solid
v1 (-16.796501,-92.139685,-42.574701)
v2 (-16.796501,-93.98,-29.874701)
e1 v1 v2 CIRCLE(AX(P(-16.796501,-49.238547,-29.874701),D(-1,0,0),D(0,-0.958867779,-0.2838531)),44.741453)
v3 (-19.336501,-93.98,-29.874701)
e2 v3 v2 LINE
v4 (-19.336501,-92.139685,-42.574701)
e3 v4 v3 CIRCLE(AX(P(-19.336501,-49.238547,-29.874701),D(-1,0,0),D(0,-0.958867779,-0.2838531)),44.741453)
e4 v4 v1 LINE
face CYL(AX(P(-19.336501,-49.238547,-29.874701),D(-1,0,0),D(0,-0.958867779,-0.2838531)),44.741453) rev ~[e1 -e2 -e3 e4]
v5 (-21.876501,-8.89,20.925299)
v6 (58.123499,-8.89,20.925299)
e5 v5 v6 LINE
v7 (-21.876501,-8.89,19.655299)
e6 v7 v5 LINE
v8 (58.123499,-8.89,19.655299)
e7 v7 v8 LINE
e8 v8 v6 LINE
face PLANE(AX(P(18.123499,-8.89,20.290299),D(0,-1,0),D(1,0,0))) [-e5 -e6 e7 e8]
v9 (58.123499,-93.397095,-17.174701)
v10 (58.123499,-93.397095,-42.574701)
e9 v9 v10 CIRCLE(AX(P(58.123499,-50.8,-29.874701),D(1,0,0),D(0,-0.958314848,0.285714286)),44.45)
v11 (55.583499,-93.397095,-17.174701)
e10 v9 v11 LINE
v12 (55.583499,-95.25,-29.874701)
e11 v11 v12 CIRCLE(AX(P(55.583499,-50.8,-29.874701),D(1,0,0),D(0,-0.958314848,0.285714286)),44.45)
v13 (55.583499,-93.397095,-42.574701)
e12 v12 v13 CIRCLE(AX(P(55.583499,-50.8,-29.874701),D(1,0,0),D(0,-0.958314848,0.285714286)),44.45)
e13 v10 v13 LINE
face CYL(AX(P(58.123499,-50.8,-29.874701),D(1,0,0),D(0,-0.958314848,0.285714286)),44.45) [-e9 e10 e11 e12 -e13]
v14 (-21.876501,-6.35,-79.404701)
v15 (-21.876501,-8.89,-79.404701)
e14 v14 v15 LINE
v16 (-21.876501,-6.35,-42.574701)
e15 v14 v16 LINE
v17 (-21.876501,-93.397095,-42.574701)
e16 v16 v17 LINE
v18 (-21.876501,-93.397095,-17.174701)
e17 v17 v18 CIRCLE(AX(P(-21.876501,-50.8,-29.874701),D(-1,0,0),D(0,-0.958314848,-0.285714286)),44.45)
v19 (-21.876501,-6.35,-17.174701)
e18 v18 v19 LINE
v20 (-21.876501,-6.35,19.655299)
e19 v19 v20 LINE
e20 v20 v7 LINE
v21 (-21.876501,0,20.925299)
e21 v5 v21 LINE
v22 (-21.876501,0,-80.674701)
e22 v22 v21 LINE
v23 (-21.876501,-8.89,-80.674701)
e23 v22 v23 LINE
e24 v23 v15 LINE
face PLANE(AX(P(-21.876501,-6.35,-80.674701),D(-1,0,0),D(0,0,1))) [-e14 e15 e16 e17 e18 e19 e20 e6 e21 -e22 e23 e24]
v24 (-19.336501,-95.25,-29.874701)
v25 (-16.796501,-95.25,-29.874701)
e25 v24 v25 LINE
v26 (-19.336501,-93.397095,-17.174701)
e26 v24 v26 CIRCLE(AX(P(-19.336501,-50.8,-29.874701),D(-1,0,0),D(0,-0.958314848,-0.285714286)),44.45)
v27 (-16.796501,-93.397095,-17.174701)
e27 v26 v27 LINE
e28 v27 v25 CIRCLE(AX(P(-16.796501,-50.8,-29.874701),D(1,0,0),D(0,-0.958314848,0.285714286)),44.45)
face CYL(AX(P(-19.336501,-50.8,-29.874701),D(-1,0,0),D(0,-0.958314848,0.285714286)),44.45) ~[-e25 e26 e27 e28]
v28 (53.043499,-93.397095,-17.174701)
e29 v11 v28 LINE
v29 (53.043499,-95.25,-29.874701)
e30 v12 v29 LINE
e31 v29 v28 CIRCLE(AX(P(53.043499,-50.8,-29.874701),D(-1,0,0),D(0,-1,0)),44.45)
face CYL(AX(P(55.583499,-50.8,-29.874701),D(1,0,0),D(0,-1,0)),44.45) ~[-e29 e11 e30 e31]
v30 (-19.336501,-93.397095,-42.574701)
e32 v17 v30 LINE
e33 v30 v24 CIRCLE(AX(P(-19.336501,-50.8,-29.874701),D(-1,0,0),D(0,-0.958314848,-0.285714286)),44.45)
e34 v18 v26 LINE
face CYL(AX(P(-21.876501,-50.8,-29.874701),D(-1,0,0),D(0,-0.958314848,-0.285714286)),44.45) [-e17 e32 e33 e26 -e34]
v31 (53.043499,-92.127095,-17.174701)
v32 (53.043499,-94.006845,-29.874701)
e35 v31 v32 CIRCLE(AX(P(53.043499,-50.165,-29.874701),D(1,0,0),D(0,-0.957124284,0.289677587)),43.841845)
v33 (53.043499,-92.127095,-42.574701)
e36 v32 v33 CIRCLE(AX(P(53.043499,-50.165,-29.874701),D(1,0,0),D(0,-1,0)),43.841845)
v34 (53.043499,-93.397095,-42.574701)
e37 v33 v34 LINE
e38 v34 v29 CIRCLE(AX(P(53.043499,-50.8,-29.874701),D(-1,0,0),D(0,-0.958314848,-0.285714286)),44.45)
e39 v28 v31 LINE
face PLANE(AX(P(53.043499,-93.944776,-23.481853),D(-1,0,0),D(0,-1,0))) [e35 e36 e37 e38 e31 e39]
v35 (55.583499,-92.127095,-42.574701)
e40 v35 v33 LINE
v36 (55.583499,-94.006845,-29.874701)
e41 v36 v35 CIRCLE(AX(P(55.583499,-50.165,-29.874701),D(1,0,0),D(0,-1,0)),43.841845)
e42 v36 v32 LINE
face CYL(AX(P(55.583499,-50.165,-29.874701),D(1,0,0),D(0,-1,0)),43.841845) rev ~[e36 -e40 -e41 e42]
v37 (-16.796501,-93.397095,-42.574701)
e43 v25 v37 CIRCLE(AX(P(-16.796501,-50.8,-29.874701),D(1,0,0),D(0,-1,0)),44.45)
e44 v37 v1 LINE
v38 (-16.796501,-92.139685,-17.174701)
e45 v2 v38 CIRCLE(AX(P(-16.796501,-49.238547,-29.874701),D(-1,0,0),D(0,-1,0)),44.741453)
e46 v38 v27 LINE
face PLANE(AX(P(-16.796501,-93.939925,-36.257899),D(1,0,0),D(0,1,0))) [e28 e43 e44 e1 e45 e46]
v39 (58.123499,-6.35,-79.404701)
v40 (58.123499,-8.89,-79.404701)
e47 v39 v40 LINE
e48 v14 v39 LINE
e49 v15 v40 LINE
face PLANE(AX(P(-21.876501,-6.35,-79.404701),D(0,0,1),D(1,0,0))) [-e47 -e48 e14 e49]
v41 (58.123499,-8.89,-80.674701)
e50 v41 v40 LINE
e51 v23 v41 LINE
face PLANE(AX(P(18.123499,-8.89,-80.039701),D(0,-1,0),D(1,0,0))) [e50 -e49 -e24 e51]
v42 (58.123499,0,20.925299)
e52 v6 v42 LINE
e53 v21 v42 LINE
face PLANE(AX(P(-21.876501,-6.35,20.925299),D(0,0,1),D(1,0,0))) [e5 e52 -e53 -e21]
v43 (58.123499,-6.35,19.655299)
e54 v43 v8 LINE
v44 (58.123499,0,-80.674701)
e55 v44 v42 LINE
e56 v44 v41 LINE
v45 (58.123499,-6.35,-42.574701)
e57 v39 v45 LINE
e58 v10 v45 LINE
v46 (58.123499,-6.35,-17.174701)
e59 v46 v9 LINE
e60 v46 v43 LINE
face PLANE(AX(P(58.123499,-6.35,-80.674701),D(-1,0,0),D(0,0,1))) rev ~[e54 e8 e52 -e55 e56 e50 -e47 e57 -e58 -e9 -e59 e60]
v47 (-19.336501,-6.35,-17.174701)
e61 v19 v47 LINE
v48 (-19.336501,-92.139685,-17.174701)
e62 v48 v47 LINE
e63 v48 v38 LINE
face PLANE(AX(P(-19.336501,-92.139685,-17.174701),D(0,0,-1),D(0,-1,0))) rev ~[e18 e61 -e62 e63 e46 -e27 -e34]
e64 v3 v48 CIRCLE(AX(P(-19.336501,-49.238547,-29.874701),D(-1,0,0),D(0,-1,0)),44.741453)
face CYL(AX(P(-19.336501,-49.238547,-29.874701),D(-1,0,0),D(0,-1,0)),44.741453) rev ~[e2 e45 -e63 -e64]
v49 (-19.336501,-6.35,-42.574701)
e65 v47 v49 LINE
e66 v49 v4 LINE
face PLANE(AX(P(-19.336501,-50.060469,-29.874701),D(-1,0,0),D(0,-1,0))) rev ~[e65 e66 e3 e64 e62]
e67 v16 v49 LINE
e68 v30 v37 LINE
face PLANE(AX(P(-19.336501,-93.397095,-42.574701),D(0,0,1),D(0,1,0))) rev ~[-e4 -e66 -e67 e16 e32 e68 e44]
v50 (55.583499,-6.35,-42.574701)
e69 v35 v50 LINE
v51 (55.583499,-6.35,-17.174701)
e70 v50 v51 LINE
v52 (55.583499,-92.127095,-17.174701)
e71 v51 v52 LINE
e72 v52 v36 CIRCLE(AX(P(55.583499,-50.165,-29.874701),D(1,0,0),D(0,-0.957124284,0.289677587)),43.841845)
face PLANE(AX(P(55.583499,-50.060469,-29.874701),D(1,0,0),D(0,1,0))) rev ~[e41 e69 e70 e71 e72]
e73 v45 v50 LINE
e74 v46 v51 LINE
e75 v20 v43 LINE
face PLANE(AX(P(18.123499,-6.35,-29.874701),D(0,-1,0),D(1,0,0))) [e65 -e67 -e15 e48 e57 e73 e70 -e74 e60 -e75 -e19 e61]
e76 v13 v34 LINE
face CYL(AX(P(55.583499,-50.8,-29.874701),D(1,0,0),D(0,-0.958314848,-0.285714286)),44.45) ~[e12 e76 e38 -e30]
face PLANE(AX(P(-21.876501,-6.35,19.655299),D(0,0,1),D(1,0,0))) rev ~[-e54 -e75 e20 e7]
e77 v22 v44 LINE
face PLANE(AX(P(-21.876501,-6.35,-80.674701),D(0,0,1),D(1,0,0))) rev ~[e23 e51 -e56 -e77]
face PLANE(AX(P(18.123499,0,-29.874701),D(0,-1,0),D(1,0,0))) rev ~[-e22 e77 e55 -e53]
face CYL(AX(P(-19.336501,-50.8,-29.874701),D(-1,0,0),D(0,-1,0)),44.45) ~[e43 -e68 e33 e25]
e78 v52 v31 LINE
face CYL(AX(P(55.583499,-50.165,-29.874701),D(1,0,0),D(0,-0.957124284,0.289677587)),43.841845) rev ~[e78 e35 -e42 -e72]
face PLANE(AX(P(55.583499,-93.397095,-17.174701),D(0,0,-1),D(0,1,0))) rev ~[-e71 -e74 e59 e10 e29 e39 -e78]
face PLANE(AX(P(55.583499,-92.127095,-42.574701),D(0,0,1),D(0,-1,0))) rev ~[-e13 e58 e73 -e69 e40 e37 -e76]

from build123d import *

# Parameters (mm, degrees)
F0_W      = 80
F0_H      = 101.6
F1_DEPTH  = 6.35
F3_DEPTH  = 2.54
F5_DEPTH  = 2.54
F7_DEPTH  = 2.54
F9_DEPTH  = 2.54
F10_W     = 80
F10_H     = 1.27
F11_DEPTH = 2.54
F12_DEPTH = 2.54


with BuildPart() as f1:
    # F0 (on Front) → F1 (new body)
    with BuildSketch(Plane.XZ):
        with Locations((18.1234987736, -29.8747005124)):
            Rectangle(F0_W, F0_H)
    extrude(amount=F1_DEPTH)

    # F2 (on face) → F3 (join)
    with BuildSketch(Plane.YZ.offset(58.1234987736)):
        with BuildLine():
            Line((-93.3970949714, -42.5747005124), (-6.35, -42.5747005124))
            Line((-6.35, -42.5747005124), (-6.35, -29.8747005124))
            Line((-6.35, -29.8747005124), (-6.35, -17.1747005124))
            Line((-6.35, -17.1747005124), (-93.3970949714, -17.1747005124))
            ThreePointArc((-93.3970949714, -17.1747005124), (-95.25, -29.8747005124), (-93.3970949714, -42.5747005124))
        make_face()
    extrude(amount=-F3_DEPTH)

    # F4 (on face) → F5 (join)
    with BuildSketch(Plane(origin=(-21.8765012264, 0, 0), x_dir=(0, -1, 0), z_dir=(-1, 0, 0))):
        with BuildLine():
            Line((93.3970949714, -17.1747005124), (6.35, -17.1747005124))
            Line((6.35, -17.1747005124), (6.35, -42.5747005124))
            Line((6.35, -42.5747005124), (93.3970949714, -42.5747005124))
            ThreePointArc((93.3970949714, -42.5747005124), (95.25, -29.8747005124), (93.3970949714, -17.1747005124))
        make_face()
    extrude(amount=-F5_DEPTH)

    # F6 (on face) → F7 (join)
    with BuildSketch(Plane.YZ.offset(-19.3365012264)):
        with BuildLine():
            ThreePointArc((-95.25, -29.8747005124), (-94.7843345492, -36.2919284389), (-93.3970949714, -42.5747005124))
            Line((-93.3970949714, -42.5747005124), (-92.1396846861, -42.5747005124))
            ThreePointArc((-92.1396846861, -42.5747005124), (-93.5175310216, -36.2910226765), (-93.98, -29.8747005124))
            Line((-93.98, -29.8747005124), (-95.25, -29.8747005124))
        make_face()
        with BuildLine():
            ThreePointArc((-93.3970949714, -17.1747005124), (-94.7843345492, -23.4574725858), (-95.25, -29.8747005124))
            Line((-95.25, -29.8747005124), (-93.98, -29.8747005124))
            ThreePointArc((-93.98, -29.8747005124), (-93.5175310216, -23.4583783483), (-92.1396846861, -17.1747005124))
            Line((-92.1396846861, -17.1747005124), (-93.3970949714, -17.1747005124))
        make_face()
    extrude(amount=F7_DEPTH)

    # F8 (on face) → F9 (join)
    with BuildSketch(Plane(origin=(55.5834987736, 0, 0), x_dir=(0, -1, 0), z_dir=(-1, 0, 0))):
        with BuildLine():
            Line((94.006845472, -29.8747005124), (95.25, -29.8747005124))
            ThreePointArc((95.25, -29.8747005124), (94.7843345492, -23.4574725858), (93.3970949714, -17.1747005124))
            Line((93.3970949714, -17.1747005124), (92.1270949714, -17.1747005124))
            ThreePointArc((92.1270949714, -17.1747005124), (93.5343618687, -23.4555210098), (94.006845472, -29.8747005124))
        make_face()
        with BuildLine():
            ThreePointArc((93.3970949714, -42.5747005124), (94.7843345492, -36.2919284389), (95.25, -29.8747005124))
            Line((95.25, -29.8747005124), (94.006845472, -29.8747005124))
            ThreePointArc((94.006845472, -29.8747005124), (93.5343618687, -36.293880015), (92.1270949714, -42.5747005124))
            Line((92.1270949714, -42.5747005124), (93.3970949714, -42.5747005124))
        make_face()
    extrude(amount=F9_DEPTH)

    # F10 (on face) → F11 (join)
    with BuildSketch(Plane.XZ.offset(6.35)):
        with Locations((18.1234987736, 20.2902994876)):
            Rectangle(F10_W, F10_H)
    extrude(amount=F11_DEPTH)

    # F10 (on face) → F12 (join)
    with BuildSketch(Plane.XZ.offset(6.35)):
        with Locations((18.1234987736, -80.0397005124)):
            Rectangle(F10_W, F10_H)
    extrude(amount=F12_DEPTH)


solid = f1.part
